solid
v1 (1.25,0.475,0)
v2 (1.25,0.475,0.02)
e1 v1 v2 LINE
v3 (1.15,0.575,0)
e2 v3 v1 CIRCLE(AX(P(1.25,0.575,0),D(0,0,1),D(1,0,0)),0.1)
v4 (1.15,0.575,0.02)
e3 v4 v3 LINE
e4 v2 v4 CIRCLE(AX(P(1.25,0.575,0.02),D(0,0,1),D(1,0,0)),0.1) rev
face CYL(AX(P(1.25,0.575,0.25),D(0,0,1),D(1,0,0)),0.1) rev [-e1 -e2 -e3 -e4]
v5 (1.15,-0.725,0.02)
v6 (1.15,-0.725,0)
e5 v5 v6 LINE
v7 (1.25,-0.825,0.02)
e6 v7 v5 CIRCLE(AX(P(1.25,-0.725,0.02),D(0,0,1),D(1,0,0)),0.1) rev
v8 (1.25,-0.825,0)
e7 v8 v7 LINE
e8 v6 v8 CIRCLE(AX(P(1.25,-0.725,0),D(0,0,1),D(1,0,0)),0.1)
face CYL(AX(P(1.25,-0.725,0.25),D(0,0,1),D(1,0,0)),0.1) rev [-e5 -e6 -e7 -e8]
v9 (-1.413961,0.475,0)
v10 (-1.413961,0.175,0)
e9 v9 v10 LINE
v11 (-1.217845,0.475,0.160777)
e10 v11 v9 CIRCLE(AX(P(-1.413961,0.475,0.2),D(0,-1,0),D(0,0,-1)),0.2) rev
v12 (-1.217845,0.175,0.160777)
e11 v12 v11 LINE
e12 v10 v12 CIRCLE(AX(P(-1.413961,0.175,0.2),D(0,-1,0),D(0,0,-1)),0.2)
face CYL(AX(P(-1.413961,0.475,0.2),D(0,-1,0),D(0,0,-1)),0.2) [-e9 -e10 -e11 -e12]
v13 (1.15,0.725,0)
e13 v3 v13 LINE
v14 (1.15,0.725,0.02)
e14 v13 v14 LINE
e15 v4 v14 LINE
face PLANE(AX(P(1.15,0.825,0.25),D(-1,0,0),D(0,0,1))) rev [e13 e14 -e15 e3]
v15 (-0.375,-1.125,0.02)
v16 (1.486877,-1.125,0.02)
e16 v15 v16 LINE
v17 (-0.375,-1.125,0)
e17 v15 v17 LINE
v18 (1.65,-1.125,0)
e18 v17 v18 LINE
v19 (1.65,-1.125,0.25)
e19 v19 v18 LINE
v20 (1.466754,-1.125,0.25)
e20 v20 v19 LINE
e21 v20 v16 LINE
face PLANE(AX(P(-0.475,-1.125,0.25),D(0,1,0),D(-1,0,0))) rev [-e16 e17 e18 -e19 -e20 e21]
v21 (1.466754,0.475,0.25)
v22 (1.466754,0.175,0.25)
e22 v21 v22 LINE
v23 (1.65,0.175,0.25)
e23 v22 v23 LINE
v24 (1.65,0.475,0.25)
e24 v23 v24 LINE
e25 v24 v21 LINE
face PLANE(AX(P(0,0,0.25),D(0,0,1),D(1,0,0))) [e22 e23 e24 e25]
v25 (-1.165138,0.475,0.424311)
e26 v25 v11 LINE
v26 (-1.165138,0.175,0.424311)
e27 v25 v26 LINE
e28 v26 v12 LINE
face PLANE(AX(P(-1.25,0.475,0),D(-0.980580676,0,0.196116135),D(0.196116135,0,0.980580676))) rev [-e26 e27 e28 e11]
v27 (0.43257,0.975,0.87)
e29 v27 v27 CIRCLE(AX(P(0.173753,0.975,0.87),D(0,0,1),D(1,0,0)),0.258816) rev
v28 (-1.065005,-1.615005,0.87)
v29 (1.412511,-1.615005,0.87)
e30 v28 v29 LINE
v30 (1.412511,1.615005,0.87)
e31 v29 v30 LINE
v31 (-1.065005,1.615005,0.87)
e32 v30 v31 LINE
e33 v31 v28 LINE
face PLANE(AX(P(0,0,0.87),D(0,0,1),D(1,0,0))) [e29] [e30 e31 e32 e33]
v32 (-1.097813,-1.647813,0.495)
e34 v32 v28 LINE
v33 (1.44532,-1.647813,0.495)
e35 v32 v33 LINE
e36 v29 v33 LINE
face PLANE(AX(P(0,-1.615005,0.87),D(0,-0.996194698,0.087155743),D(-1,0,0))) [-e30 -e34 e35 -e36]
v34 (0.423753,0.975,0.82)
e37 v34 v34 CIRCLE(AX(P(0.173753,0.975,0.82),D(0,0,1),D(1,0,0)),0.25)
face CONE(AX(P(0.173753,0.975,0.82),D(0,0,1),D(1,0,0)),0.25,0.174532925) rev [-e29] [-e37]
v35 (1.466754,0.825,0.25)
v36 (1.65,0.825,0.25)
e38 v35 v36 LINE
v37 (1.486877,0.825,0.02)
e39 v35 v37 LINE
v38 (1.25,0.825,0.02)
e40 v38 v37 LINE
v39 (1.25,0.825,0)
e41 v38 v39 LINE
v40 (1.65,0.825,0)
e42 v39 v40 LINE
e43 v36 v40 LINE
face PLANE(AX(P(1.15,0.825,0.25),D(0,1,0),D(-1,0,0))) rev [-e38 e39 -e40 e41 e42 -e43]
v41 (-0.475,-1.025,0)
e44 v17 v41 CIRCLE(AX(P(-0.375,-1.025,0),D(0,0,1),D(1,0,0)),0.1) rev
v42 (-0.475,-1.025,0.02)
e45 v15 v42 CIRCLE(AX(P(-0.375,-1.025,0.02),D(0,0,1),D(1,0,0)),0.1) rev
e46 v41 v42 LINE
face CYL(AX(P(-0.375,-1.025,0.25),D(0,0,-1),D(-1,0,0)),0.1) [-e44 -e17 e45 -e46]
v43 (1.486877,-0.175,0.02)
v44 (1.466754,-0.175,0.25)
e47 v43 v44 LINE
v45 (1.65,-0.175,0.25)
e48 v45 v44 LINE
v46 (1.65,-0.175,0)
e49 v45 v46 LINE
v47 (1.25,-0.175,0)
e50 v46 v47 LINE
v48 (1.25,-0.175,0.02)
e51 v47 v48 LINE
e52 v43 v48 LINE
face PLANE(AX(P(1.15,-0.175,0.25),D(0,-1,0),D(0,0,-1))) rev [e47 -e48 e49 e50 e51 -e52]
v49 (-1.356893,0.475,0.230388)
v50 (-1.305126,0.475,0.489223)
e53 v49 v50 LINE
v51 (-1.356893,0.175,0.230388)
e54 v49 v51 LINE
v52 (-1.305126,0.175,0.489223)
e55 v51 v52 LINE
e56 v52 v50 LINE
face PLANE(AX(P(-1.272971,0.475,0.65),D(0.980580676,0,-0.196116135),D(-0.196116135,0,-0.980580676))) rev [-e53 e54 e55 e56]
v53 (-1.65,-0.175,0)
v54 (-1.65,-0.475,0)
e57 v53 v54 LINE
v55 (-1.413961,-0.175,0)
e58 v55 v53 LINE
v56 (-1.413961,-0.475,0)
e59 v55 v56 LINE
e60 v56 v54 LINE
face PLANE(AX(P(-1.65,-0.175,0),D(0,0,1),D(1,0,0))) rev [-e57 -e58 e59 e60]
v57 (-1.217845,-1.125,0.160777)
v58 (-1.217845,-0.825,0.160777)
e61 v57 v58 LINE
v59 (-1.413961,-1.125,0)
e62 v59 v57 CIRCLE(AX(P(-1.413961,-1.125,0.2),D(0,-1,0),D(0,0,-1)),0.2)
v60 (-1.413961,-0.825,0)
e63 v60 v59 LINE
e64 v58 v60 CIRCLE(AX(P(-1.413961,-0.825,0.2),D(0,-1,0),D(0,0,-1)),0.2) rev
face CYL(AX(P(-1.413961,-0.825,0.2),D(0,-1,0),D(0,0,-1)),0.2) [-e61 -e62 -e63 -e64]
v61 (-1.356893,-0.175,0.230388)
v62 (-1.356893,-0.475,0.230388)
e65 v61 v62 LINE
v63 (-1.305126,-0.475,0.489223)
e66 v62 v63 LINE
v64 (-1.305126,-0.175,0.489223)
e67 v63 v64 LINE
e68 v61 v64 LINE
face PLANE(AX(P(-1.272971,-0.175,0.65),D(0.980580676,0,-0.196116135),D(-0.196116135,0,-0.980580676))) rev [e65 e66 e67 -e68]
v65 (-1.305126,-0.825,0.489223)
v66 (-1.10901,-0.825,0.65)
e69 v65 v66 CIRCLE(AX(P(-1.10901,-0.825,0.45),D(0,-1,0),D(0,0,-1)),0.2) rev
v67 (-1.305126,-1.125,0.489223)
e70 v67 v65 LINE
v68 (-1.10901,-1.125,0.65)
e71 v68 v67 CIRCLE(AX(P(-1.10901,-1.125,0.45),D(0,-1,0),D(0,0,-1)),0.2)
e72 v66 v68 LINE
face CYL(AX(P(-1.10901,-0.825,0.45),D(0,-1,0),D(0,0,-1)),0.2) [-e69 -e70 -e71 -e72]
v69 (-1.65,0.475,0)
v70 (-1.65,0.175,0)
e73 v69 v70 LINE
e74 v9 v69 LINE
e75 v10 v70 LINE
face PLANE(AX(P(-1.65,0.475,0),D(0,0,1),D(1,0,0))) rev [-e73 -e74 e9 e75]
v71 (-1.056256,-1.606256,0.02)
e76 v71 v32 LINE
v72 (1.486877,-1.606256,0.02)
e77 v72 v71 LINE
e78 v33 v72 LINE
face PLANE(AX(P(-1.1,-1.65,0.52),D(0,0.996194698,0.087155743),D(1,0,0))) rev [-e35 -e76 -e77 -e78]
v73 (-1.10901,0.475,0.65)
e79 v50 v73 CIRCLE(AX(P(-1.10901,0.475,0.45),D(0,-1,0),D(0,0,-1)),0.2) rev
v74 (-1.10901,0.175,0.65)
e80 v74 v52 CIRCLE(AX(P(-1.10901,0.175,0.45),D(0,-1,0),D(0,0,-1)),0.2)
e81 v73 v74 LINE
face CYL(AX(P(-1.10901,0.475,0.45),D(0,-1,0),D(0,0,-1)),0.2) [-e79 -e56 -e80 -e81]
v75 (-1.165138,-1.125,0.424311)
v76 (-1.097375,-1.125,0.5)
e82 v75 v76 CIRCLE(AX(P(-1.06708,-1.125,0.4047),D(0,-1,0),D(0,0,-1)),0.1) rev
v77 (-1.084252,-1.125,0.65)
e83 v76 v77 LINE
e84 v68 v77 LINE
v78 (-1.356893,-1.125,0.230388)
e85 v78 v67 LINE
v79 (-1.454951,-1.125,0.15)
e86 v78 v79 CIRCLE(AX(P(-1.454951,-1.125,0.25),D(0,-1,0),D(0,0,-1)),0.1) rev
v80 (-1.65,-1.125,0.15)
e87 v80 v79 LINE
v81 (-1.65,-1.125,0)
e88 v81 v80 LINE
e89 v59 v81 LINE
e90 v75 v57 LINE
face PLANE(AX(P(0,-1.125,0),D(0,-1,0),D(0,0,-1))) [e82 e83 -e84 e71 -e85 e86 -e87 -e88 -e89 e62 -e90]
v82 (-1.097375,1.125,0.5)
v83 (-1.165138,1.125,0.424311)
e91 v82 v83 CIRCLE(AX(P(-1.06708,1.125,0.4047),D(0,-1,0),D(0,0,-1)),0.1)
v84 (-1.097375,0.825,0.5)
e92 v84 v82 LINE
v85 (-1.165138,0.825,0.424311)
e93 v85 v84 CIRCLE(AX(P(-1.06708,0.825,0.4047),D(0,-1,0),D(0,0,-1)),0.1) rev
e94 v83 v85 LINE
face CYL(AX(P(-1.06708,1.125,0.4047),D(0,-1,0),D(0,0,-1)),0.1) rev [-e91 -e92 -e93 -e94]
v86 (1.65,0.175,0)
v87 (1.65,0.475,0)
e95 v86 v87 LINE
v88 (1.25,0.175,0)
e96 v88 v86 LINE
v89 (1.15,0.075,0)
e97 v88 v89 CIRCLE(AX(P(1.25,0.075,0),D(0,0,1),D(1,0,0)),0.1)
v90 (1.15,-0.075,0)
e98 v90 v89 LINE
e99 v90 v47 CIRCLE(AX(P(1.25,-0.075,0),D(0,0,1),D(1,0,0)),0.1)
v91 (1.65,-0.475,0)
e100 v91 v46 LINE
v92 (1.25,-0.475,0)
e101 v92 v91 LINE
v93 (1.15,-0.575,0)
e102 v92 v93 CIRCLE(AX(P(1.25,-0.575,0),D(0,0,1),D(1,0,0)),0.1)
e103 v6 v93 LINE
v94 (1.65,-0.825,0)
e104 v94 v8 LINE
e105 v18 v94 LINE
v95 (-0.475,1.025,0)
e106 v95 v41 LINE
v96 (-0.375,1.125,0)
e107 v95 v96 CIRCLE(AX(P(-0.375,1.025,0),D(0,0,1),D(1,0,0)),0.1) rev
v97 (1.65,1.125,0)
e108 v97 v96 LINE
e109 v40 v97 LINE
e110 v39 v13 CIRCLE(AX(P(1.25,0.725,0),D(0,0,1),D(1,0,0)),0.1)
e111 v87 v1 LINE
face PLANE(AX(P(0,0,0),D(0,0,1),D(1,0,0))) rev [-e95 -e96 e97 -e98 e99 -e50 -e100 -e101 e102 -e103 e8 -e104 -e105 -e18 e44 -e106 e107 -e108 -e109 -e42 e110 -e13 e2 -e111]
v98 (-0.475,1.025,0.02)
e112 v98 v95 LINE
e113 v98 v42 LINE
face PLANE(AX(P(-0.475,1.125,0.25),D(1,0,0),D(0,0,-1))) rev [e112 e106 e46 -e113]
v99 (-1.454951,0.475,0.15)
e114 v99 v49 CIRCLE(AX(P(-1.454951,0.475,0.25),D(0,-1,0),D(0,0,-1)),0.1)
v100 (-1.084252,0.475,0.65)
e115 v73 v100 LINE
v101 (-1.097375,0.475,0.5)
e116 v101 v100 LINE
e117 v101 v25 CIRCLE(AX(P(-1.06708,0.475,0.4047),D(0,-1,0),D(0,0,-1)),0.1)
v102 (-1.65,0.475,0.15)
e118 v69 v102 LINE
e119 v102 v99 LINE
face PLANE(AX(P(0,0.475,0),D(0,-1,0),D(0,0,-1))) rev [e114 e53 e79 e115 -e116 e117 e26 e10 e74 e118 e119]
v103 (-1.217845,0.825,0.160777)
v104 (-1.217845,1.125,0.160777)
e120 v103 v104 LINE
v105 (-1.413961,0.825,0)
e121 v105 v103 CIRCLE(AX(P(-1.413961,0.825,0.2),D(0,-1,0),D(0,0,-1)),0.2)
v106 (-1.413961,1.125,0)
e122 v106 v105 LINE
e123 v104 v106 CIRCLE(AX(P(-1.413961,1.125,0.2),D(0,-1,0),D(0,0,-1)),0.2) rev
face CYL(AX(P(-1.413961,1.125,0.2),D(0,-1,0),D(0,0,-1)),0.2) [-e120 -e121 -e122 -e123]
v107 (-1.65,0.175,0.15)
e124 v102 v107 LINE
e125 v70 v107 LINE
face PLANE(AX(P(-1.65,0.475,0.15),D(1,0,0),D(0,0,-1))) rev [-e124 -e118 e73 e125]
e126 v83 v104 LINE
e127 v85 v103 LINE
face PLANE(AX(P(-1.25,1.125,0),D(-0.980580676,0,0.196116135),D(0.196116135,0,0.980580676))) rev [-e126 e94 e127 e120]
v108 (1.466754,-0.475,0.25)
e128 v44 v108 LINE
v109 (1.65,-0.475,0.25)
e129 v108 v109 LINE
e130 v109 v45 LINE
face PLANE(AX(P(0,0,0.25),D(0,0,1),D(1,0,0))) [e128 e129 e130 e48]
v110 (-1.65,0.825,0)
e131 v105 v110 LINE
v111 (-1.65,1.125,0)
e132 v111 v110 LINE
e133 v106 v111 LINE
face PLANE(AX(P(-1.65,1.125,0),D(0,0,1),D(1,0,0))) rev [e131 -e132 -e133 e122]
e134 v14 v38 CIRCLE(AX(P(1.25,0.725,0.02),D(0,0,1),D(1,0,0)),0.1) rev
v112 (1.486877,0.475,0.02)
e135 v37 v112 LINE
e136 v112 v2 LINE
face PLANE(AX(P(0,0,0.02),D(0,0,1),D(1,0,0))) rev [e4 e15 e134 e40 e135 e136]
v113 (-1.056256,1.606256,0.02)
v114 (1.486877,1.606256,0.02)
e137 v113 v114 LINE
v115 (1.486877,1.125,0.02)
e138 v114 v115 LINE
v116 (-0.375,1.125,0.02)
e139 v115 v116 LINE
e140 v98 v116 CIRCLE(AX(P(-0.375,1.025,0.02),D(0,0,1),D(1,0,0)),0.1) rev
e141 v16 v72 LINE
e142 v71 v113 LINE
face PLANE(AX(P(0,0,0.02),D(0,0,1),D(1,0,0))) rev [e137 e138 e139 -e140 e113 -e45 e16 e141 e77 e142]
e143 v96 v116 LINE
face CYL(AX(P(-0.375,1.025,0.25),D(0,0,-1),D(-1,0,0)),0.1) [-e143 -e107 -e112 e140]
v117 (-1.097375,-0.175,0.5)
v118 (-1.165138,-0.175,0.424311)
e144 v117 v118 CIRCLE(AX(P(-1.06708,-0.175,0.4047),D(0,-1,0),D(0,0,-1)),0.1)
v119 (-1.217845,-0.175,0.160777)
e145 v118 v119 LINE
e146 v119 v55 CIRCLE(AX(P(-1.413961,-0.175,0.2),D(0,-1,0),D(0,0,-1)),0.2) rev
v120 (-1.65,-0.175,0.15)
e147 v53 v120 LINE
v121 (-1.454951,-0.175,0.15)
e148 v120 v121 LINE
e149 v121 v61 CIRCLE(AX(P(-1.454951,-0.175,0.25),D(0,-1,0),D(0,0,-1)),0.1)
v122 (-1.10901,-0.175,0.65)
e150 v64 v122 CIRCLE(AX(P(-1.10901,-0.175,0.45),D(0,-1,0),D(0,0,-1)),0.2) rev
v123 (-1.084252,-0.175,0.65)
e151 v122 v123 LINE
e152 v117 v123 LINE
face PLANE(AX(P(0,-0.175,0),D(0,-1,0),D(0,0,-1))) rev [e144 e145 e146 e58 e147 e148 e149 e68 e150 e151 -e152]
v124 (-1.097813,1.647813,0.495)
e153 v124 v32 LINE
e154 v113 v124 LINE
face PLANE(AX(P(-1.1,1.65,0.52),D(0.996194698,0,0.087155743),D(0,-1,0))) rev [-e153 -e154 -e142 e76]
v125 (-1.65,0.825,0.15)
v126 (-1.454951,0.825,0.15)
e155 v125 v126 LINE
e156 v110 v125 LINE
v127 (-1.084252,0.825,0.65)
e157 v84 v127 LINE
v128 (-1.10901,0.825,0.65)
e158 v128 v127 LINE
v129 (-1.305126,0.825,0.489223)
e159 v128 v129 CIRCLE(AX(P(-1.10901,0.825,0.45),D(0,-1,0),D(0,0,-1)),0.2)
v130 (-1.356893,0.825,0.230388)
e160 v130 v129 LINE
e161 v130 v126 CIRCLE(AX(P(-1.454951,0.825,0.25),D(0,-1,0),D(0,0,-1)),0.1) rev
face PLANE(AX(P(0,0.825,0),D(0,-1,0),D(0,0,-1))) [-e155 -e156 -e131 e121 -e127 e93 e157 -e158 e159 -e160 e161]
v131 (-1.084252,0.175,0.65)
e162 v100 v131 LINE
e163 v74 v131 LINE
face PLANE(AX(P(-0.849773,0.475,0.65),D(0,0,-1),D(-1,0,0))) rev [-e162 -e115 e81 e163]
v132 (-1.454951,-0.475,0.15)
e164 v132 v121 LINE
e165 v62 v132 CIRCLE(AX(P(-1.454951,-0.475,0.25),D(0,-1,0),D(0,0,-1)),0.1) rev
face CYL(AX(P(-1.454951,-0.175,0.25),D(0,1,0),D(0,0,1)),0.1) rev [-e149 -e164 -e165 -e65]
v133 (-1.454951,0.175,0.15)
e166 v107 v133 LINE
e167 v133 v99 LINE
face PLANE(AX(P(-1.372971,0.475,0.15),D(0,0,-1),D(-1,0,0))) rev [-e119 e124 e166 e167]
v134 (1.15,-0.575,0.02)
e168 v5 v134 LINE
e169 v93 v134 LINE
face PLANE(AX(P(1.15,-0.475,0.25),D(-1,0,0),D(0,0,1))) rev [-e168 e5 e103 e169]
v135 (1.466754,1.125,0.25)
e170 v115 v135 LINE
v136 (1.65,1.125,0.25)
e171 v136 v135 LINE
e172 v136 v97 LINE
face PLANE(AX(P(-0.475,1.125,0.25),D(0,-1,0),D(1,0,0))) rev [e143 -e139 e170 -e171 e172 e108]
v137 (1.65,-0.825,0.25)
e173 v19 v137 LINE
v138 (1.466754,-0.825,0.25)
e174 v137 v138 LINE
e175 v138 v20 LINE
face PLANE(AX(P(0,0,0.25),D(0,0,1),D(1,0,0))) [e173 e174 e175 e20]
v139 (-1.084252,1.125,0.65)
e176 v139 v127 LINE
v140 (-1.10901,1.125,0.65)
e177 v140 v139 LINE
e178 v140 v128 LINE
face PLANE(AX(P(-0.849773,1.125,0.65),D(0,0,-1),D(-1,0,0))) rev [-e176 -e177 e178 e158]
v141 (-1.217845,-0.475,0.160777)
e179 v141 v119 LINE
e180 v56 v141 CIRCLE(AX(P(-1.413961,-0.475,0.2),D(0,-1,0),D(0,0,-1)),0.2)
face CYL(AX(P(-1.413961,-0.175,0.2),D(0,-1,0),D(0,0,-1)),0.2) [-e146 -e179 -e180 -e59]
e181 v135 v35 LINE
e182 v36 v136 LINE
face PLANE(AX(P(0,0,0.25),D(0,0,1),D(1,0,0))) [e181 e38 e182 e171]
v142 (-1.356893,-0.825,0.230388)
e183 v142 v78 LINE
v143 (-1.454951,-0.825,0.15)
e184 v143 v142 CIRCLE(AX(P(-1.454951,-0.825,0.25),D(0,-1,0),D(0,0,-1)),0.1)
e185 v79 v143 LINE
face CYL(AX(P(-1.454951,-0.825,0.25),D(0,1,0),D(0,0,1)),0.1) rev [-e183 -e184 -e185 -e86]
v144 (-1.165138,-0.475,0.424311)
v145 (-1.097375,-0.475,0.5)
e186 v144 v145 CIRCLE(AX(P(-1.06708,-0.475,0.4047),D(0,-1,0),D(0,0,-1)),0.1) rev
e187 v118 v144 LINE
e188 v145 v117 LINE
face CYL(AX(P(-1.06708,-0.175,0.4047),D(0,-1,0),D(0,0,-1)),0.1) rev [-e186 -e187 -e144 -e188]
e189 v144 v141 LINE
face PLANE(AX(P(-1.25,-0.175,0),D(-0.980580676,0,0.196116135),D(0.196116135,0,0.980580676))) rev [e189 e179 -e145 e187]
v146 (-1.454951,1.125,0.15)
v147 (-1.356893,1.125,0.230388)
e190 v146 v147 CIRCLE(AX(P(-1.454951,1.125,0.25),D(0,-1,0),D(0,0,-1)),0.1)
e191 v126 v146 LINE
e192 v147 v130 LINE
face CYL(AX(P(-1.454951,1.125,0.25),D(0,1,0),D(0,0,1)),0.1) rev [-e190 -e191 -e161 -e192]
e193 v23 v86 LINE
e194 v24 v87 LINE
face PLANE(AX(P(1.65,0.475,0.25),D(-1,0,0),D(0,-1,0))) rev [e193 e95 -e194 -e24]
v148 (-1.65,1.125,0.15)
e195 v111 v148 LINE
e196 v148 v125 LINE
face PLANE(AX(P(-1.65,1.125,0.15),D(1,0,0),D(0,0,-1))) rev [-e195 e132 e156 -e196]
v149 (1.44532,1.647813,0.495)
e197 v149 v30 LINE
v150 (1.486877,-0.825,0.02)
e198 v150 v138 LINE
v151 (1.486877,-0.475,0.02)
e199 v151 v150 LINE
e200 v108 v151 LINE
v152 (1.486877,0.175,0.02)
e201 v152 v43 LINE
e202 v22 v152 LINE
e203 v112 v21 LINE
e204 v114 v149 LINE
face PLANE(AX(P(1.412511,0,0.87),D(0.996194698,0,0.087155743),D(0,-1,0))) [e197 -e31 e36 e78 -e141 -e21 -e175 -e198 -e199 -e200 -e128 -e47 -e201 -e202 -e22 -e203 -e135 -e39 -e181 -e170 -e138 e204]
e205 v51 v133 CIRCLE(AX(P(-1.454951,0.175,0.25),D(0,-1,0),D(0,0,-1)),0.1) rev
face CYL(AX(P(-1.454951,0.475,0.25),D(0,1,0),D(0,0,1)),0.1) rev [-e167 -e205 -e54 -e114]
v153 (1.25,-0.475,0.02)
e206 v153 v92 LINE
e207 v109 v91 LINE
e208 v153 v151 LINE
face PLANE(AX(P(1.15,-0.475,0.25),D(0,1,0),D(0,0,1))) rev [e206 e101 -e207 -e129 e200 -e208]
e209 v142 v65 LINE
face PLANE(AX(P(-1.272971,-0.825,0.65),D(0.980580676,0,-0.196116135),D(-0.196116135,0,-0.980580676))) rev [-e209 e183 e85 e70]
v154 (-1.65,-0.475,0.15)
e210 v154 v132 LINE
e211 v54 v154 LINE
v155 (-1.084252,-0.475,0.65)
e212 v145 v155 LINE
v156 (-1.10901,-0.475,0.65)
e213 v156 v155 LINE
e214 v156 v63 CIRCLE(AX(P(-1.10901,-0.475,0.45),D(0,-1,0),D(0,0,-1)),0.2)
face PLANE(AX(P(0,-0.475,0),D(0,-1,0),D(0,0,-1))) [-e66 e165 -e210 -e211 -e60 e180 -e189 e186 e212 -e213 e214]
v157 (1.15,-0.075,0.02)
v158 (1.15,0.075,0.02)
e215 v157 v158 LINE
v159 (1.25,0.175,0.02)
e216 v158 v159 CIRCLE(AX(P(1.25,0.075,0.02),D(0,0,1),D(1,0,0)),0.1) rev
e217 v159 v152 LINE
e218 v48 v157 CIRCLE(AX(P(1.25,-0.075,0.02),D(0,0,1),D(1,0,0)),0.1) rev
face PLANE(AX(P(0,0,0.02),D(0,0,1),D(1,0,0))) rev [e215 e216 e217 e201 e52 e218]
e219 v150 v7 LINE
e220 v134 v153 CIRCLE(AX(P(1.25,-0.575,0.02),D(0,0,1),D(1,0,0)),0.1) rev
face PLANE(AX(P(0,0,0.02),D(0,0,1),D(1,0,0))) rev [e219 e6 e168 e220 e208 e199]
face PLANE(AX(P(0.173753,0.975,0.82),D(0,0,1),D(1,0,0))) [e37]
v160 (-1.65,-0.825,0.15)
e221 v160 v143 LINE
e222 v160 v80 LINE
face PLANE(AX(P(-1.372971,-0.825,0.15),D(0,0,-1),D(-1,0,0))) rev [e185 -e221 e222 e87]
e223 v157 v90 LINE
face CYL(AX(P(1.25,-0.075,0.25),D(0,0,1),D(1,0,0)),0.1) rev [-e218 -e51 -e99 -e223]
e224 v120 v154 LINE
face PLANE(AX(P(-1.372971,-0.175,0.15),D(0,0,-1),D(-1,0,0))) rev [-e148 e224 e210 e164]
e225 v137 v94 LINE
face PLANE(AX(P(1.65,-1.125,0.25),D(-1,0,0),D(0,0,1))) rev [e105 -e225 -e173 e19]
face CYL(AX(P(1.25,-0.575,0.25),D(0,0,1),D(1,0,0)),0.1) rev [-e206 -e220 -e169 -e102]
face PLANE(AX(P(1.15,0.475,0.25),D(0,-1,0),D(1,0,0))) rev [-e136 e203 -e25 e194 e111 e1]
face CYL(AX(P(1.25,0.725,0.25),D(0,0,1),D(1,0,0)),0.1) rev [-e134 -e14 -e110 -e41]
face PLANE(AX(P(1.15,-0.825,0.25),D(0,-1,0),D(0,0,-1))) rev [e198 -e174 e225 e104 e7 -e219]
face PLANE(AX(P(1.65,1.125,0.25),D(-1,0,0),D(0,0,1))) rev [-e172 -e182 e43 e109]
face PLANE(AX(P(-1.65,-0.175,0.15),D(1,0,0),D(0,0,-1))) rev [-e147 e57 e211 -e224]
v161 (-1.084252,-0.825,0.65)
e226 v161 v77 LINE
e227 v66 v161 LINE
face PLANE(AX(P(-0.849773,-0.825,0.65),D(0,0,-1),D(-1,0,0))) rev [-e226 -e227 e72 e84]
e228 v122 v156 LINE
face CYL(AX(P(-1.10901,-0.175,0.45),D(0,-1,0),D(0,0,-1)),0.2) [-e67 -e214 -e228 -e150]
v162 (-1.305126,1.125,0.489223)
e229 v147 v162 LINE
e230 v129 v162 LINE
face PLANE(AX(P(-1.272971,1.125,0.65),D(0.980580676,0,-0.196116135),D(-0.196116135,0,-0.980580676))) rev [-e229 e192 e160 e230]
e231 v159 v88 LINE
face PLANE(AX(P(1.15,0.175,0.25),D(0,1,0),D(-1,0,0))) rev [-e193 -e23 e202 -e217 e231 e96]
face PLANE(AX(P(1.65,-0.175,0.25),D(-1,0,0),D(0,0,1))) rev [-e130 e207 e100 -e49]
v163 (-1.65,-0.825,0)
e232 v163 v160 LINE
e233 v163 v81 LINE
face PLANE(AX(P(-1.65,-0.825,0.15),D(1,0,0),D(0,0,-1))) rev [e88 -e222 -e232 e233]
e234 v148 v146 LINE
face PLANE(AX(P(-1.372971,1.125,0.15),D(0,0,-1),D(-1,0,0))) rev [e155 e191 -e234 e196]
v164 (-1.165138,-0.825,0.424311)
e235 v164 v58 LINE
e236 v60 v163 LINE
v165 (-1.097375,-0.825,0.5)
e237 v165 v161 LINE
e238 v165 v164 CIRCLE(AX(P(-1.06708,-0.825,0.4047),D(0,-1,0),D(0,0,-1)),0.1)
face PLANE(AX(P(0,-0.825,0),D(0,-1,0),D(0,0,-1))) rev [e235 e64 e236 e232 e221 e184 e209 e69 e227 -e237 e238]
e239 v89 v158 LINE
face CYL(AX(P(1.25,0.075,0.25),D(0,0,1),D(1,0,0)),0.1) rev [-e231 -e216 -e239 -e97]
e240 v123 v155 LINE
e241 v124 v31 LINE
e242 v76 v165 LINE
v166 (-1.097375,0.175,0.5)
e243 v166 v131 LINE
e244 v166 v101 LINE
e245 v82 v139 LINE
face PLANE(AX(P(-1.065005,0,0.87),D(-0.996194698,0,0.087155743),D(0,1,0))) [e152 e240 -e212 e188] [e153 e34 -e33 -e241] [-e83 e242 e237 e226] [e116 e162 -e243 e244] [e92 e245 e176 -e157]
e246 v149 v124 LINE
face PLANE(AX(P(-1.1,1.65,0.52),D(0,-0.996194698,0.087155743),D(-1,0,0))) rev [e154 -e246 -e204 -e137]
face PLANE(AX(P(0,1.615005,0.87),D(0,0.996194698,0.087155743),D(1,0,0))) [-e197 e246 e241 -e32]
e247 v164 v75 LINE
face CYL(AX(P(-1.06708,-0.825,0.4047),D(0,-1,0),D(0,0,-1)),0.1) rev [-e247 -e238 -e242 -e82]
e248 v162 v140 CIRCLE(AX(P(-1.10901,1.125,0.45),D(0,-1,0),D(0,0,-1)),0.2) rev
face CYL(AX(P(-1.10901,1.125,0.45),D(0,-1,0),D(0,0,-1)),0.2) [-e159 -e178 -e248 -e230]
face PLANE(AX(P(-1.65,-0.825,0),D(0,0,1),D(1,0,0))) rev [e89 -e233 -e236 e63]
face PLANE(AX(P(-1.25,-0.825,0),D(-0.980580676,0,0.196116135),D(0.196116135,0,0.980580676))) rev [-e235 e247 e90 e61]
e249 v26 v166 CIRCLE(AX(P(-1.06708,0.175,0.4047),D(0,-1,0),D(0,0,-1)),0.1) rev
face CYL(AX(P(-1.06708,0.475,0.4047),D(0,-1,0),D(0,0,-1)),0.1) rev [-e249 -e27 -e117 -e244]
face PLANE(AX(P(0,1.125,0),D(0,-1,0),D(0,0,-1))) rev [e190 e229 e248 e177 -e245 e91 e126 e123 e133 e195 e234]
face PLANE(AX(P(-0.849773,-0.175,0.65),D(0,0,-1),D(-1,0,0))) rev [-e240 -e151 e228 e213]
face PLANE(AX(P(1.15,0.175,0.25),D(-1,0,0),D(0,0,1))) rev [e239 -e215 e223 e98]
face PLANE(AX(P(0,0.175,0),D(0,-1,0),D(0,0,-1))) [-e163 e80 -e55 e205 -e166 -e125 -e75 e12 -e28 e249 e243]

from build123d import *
from OCP.BRepFilletAPI import BRepFilletAPI_MakeChamfer

# Parameters (mm, degrees)
BOSS_EXTRUDE1_DEPTH    = 0.25
FILLET1_R              = 0.1
SKETCH3_W              = 2.6
SKETCH3_H              = 3.3
BOSS_EXTRUDE2_DEPTH    = 0.85
CHAMFER2_SIZE          = 1
CHAMFER2_SIZE_2        = 0.087488664
CHAMFER3_SIZE          = 0.4
CHAMFER3_SIZE2         = 0.034995465
CHAMFER4_SIZE          = 0.043744332
CHAMFER4_SIZE_2        = 0.5
BOSS_EXTRUDE3_DEPTH    = 0.15
FILLET2_R              = 0.1
FILLET3_R              = 0.2
LPATTERN1_COUNT        = 4
LPATTERN1_PITCH        = 0.65
FILLET2_OF_LPATTERN1_R = 0.1
FILLET3_OF_LPATTERN1_R = 0.2
SKETCH5_R              = 0.25
CUT_EXTRUDE1_DEPTH     = 0.05
CHAMFER5_SIZE2         = 0.05
CHAMFER5_SIZE          = 0.008816349


# Some blends are built 0.0001 mm under size
with BuildPart() as part:
    # Sketch2 → Boss-Extrude1 (new body)
    with BuildSketch(Plane.XY):
        Polygon((1.15, 0.175), (1.15, -0.175), (1.65, -0.175), (1.65, -0.475), (1.15, -0.475), (1.15, -0.825), (1.65, -0.825), (1.65, -1.125), (-0.475, -1.125), (-0.475, 1.125), (1.65, 1.125), (1.65, 0.825), (1.15, 0.825), (1.15, 0.475), (1.65, 0.475), (1.65, 0.175), align=None)
    extrude(amount=BOSS_EXTRUDE1_DEPTH)

    # Fillet1
    fillet1_edges = [part.edges().sort_by_distance(p)[0] for p in [
        (-0.475, 1.125, 0.125),
        (1.15, 0.825, 0.125),
        (1.15, 0.475, 0.125),
        (1.15, 0.175, 0.125),
        (1.15, -0.175, 0.125),
        (1.15, -0.475, 0.125),
        (1.15, -0.825, 0.125),
        (-0.475, -1.125, 0.125),
    ]]
    fillet(fillet1_edges, radius=FILLET1_R)

    # Sketch3 → Boss-Extrude2 (add)
    with BuildSketch(Plane.XY.offset(0.02)):
        with Locations((0.2, 0)):
            Rectangle(SKETCH3_W, SKETCH3_H)
    extrude(amount=BOSS_EXTRUDE2_DEPTH)

    # Chamfer2
    # the kernel refuses this chamfer: 1, 0.087488664 mm, written as the material it takes off along each edge
    with BuildSketch(Plane(origin=(1.5, 4.24963408, 0.87), x_dir=(0.0033526157940331684, 0, -0.9999943799678764), z_dir=(0, -1, 0))) as chamfer2_piece_1_section:
        Polygon((CHAMFER2_SIZE * 0.999994379968, -CHAMFER2_SIZE * 0.00335261579403), (-CHAMFER2_SIZE_2 * 0.00335261577587, -CHAMFER2_SIZE_2 * 0.999994374549), (0, 0), align=None)
    chamfer2_piece_1 = extrude(amount=8.49926816, mode=Mode.PRIVATE)
    chamfer2_piece_1 = split(chamfer2_piece_1, bisect_by=Plane(origin=(1.487680055, 1.125, 0.15163522), z_dir=(0, 1, 0)), keep=Keep.TOP, mode=Mode.PRIVATE)
    add(chamfer2_piece_1, mode=Mode.SUBTRACT)
    with BuildSketch(Plane(origin=(1.5, 4.24963408, 0.87), x_dir=(0.0033526157940331684, 0, -0.9999943799678764), z_dir=(0, -1, 0))) as chamfer2_piece_2_section:
        Polygon((CHAMFER2_SIZE * 0.999994379968, -CHAMFER2_SIZE * 0.00335261579403), (-CHAMFER2_SIZE_2 * 0.00335261577587, -CHAMFER2_SIZE_2 * 0.999994374549), (0, 0), align=None)
    chamfer2_piece_2 = extrude(amount=8.49926816, mode=Mode.PRIVATE)
    chamfer2_piece_2 = split(chamfer2_piece_2, bisect_by=Plane(origin=(1.467785575, 0.975, 0.25), z_dir=(0, 0, 1)), keep=Keep.TOP, mode=Mode.PRIVATE)
    add(chamfer2_piece_2, mode=Mode.SUBTRACT)
    with BuildSketch(Plane(origin=(1.5, 4.24963408, 0.87), x_dir=(0.0033526157940331684, 0, -0.9999943799678764), z_dir=(0, -1, 0))) as chamfer2_piece_3_section:
        Polygon((CHAMFER2_SIZE * 0.999994379968, -CHAMFER2_SIZE * 0.00335261579403), (-CHAMFER2_SIZE_2 * 0.00335261577587, -CHAMFER2_SIZE_2 * 0.999994374549), (0, 0), align=None)
    chamfer2_piece_3 = extrude(amount=8.49926816, mode=Mode.PRIVATE)
    chamfer2_piece_3 = split(chamfer2_piece_3, bisect_by=Plane(origin=(1.487680055, 0.475, 0.15163522), z_dir=(0, 1, 0)), keep=Keep.TOP, mode=Mode.PRIVATE)
    chamfer2_piece_3 = split(chamfer2_piece_3, bisect_by=Plane(origin=(1.487680055, 0.825, 0.15163522), z_dir=(0, -1, 0)), keep=Keep.TOP, mode=Mode.PRIVATE)
    add(chamfer2_piece_3, mode=Mode.SUBTRACT)
    with BuildSketch(Plane(origin=(1.5, 4.24963408, 0.87), x_dir=(0.0033526157940331684, 0, -0.9999943799678764), z_dir=(0, -1, 0))) as chamfer2_piece_4_section:
        Polygon((CHAMFER2_SIZE * 0.999994379968, -CHAMFER2_SIZE * 0.00335261579403), (-CHAMFER2_SIZE_2 * 0.00335261577587, -CHAMFER2_SIZE_2 * 0.999994374549), (0, 0), align=None)
    chamfer2_piece_4 = extrude(amount=8.49926816, mode=Mode.PRIVATE)
    chamfer2_piece_4 = split(chamfer2_piece_4, bisect_by=Plane(origin=(1.487680055, 0.175, 0.15163522), z_dir=(0, -1, 0)), keep=Keep.TOP, mode=Mode.PRIVATE)
    chamfer2_piece_4 = split(chamfer2_piece_4, bisect_by=Plane(origin=(1.487680055, -0.175, 0.15163522), z_dir=(0, 1, 0)), keep=Keep.TOP, mode=Mode.PRIVATE)
    add(chamfer2_piece_4, mode=Mode.SUBTRACT)
    with BuildSketch(Plane(origin=(1.5, 4.24963408, 0.87), x_dir=(0.0033526157940331684, 0, -0.9999943799678764), z_dir=(0, -1, 0))) as chamfer2_piece_5_section:
        Polygon((CHAMFER2_SIZE * 0.999994379968, -CHAMFER2_SIZE * 0.00335261579403), (-CHAMFER2_SIZE_2 * 0.00335261577587, -CHAMFER2_SIZE_2 * 0.999994374549), (0, 0), align=None)
    chamfer2_piece_5 = extrude(amount=8.49926816, mode=Mode.PRIVATE)
    chamfer2_piece_5 = split(chamfer2_piece_5, bisect_by=Plane(origin=(1.487680055, -0.475, 0.15163522), z_dir=(0, -1, 0)), keep=Keep.TOP, mode=Mode.PRIVATE)
    chamfer2_piece_5 = split(chamfer2_piece_5, bisect_by=Plane(origin=(1.487680055, -0.825, 0.15163522), z_dir=(0, 1, 0)), keep=Keep.TOP, mode=Mode.PRIVATE)
    add(chamfer2_piece_5, mode=Mode.SUBTRACT)
    with BuildSketch(Plane(origin=(1.5, 4.24963408, 0.87), x_dir=(0.0033526157940331684, 0, -0.9999943799678764), z_dir=(0, -1, 0))) as chamfer2_piece_6_section:
        Polygon((CHAMFER2_SIZE * 0.999994379968, -CHAMFER2_SIZE * 0.00335261579403), (-CHAMFER2_SIZE_2 * 0.00335261577587, -CHAMFER2_SIZE_2 * 0.999994374549), (0, 0), align=None)
    chamfer2_piece_6 = extrude(amount=8.49926816, mode=Mode.PRIVATE)
    chamfer2_piece_6 = split(chamfer2_piece_6, bisect_by=Plane(origin=(1.487680055, -1.125, 0.15163522), z_dir=(0, -1, 0)), keep=Keep.TOP, mode=Mode.PRIVATE)
    add(chamfer2_piece_6, mode=Mode.SUBTRACT)

    # Chamfer3: one chamfer whose edges measure the first distance from different faces: ONE call of the kernel's chamfer builder (chamfer() names one face for all edges)
    chamfer3_edges_1 = [part.edges().sort_by_distance(p)[0] for p in [
        (-1.1, 0, 0.87),
    ]]
    chamfer3_side_1 = [part.faces().sort_by_distance(p)[0] for p in [
        (-1.1, 0, 0.445),
    ]]
    chamfer3_edges_2 = [part.edges().sort_by_distance(p)[0] for p in [
        (0.156255668, -1.65, 0.87),
    ]]
    chamfer3_side_2 = [part.faces().sort_by_distance(p)[0] for p in [
        (0.174937383, -1.65, 0.442934048),
    ]]
    chamfer3_edges_3 = [part.edges().sort_by_distance(p)[0] for p in [
        (0.156255668, 1.65, 0.87),
    ]]
    chamfer3_side_3 = [part.faces().sort_by_distance(p)[0] for p in [
        (0.174937383, 1.65, 0.442934048),
    ]]
    chamfer3 = BRepFilletAPI_MakeChamfer(part.part.solid().wrapped)
    for e in chamfer3_edges_1:
        chamfer3.Add(CHAMFER3_SIZE, CHAMFER3_SIZE2, e.wrapped, chamfer3_side_1[0].wrapped)  # the first distance lies on this face
    for e in chamfer3_edges_2:
        chamfer3.Add(CHAMFER3_SIZE, CHAMFER3_SIZE2, e.wrapped, chamfer3_side_2[0].wrapped)  # the first distance lies on this face
    for e in chamfer3_edges_3:
        chamfer3.Add(CHAMFER3_SIZE, CHAMFER3_SIZE2, e.wrapped, chamfer3_side_3[0].wrapped)  # the first distance lies on this face
    add(Compound.cast(chamfer3.Shape()), mode=Mode.REPLACE)

    # Chamfer4
    # the kernel refuses this chamfer: 0.5, 0.043744332 mm, written as the material it takes off along each edge
    with BuildSketch(Plane(origin=(-2.39981704, 1.65, 0.02), x_dir=(0, -0.9159861691531118, -0.4012098427509062), z_dir=(1, 0, 0))) as chamfer4_piece_1:
        Polygon((CHAMFER4_SIZE * 0.91598616419, -CHAMFER4_SIZE * 0.401209840577), (-CHAMFER4_SIZE_2 * 0.401209842751, -CHAMFER4_SIZE_2 * 0.915986169153), (0, 0), align=None)
    extrude(amount=5.18651078, mode=Mode.SUBTRACT)
    with BuildSketch(Plane(origin=(-1.1, -2.94981704, 0.02), x_dir=(0.9159861691531118, 0, -0.4012098427509062), z_dir=(0, 1, 0))) as chamfer4_piece_2:
        Polygon((CHAMFER4_SIZE * 0.91598616419, -CHAMFER4_SIZE * 0.401209840577), (-CHAMFER4_SIZE_2 * 0.401209842751, -CHAMFER4_SIZE_2 * 0.915986169153), (0, 0), align=None)
    extrude(amount=5.89963408, mode=Mode.SUBTRACT)
    with BuildSketch(Plane(origin=(2.78669374, -1.65, 0.02), x_dir=(0, -0.0033526157940331684, 0.9999943799678764), z_dir=(-1, 0, 0))) as chamfer4_piece_3:
        Polygon((CHAMFER4_SIZE_2 * 0.999994379968, CHAMFER4_SIZE_2 * 0.00335261579403), (-CHAMFER4_SIZE * 0.00335261577587, CHAMFER4_SIZE * 0.999994374549), (0, 0), align=None)
    extrude(amount=5.18651078, mode=Mode.SUBTRACT)

    # Sketch4 → Boss-Extrude3 (add, symmetric)
    with BuildSketch(Plane(origin=(0, 0.975, 0), x_dir=(1, 0, 0), z_dir=(0, 1, 0))):
        Polygon((-1.65, 0), (-1.25, 0), (-1.15, -0.5), (-0.849772873, -0.5), (-0.849772873, -0.65), (-1.272970585, -0.65), (-1.372970585, -0.15), (-1.65, -0.15), align=None)
    boss_extrude3 = extrude(amount=BOSS_EXTRUDE3_DEPTH, both=True)

    # Fillet2
    # the kernel refuses this fillet: 0.1 mm, written as the material it adds along each edge
    with BuildSketch(Plane(origin=(-1.372970585, 0.825, 0.15), x_dir=(0.19611613513818507, 0, 0.98058067569092), z_dir=(0, 1, 0))) as fillet2_piece_1:
        with BuildLine():
            CenterArc((FILLET2_R * 0.819803902719, -FILLET2_R), FILLET2_R, 90, 78.690067526)
            Line((-FILLET2_R * 0.160776772972, -FILLET2_R * 0.803883864862), (-FILLET2_R * 0.180388386486, -FILLET2_R * 0.799961542159))
            Line((-FILLET2_R * 0.180388386486, -FILLET2_R * 0.799961542159), (-FILLET2_R * 0.0163960780544, FILLET2_R * 0.02))
            Line((-FILLET2_R * 0.0163960780544, FILLET2_R * 0.02), (FILLET2_R * 0.819803902719, FILLET2_R * 0.02))
            Line((FILLET2_R * 0.819803902719, FILLET2_R * 0.02), (FILLET2_R * 0.819803902719, 0))
        make_face()
    extrude(amount=0.3)
    with BuildSketch(Plane(origin=(-1.15, 1.125, 0.5), x_dir=(1, 0, 0), z_dir=(0, -1, 0))) as fillet2_piece_2:
        with BuildLine():
            CenterArc((0.082920302, -0.095300441), FILLET2_R, 107.635259495, 61.054808031)
            Line((-0.015137766, -0.075688828), (-0.017098927, -0.075296595))
            Line((-0.017098927, -0.075296595), (-0.001961161, 0.000392232))
            Line((-0.001961161, 0.000392232), (0, 0.002))
            ThreePointArc((0, 0.002), (0.02631233, 0.002), (0.052018747, 0.001906009))
            Line((0.052018747, 0.001906009), (0.05262466, 0))
        make_face()
    extrude(amount=0.3)

    # Fillet3
    fillet3_edges = [part.edges().sort_by_distance(p)[0] for p in [
        (-1.272970585, 0.975, 0.65),
        (-1.25, 0.975, 0),
    ]]
    fillet(fillet3_edges, radius=FILLET3_R)

    # LPattern1: Boss-Extrude3 ×4
    with Locations(*[(0, -i * LPATTERN1_PITCH, 0) for i in range(1, LPATTERN1_COUNT)]):
        add(boss_extrude3)

    # Fillet2 of LPattern1
    # the kernel refuses this fillet: 0.1 mm, written as the material it adds along each edge
    with BuildSketch(Plane(origin=(-1.372970585, 0.175, 0.15), x_dir=(0.19611613513818507, 0, 0.98058067569092), z_dir=(0, 1, 0)), Plane(origin=(-1.372970585, -0.475, 0.15), x_dir=(0.19611613513818507, 0, 0.98058067569092), z_dir=(0, 1, 0)), Plane(origin=(-1.372970585, -1.125, 0.15), x_dir=(0.19611613513818507, 0, 0.98058067569092), z_dir=(0, 1, 0))) as fillet2_of_lpattern1_piece_1:
        with BuildLine():
            CenterArc((FILLET2_OF_LPATTERN1_R * 0.819803902719, -FILLET2_OF_LPATTERN1_R), FILLET2_OF_LPATTERN1_R, 90, 78.690067526)
            Line((-FILLET2_OF_LPATTERN1_R * 0.160776772972, -FILLET2_OF_LPATTERN1_R * 0.803883864862), (-FILLET2_OF_LPATTERN1_R * 0.180388386486, -FILLET2_OF_LPATTERN1_R * 0.799961542159))
            Line((-FILLET2_OF_LPATTERN1_R * 0.180388386486, -FILLET2_OF_LPATTERN1_R * 0.799961542159), (-FILLET2_OF_LPATTERN1_R * 0.0163960780544, FILLET2_OF_LPATTERN1_R * 0.02))
            Line((-FILLET2_OF_LPATTERN1_R * 0.0163960780544, FILLET2_OF_LPATTERN1_R * 0.02), (FILLET2_OF_LPATTERN1_R * 0.819803902719, FILLET2_OF_LPATTERN1_R * 0.02))
            Line((FILLET2_OF_LPATTERN1_R * 0.819803902719, FILLET2_OF_LPATTERN1_R * 0.02), (FILLET2_OF_LPATTERN1_R * 0.819803902719, 0))
        make_face()
    extrude(amount=0.3)
    with BuildSketch(Plane(origin=(-1.15, 0.475, 0.5), x_dir=(1, 0, 0), z_dir=(0, -1, 0)), Plane(origin=(-1.15, -0.175, 0.5), x_dir=(1, 0, 0), z_dir=(0, -1, 0)), Plane(origin=(-1.15, -0.825, 0.5), x_dir=(1, 0, 0), z_dir=(0, -1, 0))) as fillet2_of_lpattern1_piece_2:
        with BuildLine():
            CenterArc((0.082920302, -0.095300441), FILLET2_OF_LPATTERN1_R, 107.635259495, 61.054808031)
            Line((-0.015137766, -0.075688828), (-0.017098927, -0.075296595))
            Line((-0.017098927, -0.075296595), (-0.001961161, 0.000392232))
            Line((-0.001961161, 0.000392232), (0, 0.002))
            ThreePointArc((0, 0.002), (0.02631233, 0.002), (0.052018747, 0.001906009))
            Line((0.052018747, 0.001906009), (0.05262466, 0))
        make_face()
    extrude(amount=0.3)

    # Fillet3 of LPattern1
    fillet3_of_lpattern1_edges = [part.edges().sort_by_distance(p)[0] for p in [
        (-1.272970585, 0.325, 0.65),
        (-1.25, 0.325, 0),
        (-1.272970585, -0.325, 0.65),
        (-1.25, -0.325, 0),
        (-1.272970585, -0.975, 0.65),
        (-1.25, -0.975, 0),
    ]]
    fillet(fillet3_of_lpattern1_edges, radius=FILLET3_OF_LPATTERN1_R)

    # Sketch5 → Cut-Extrude1 (cut)
    with BuildSketch(Plane.XY.offset(0.87)):
        with Locations((0.173753401, 0.975)):
            Circle(SKETCH5_R)
    extrude(amount=-CUT_EXTRUDE1_DEPTH, mode=Mode.SUBTRACT)

    # Chamfer5
    chamfer5_edges = [part.edges().sort_by_distance(p)[0] for p in [
        (-0.076246599, 0.975, 0.87),
    ]]
    chamfer5_side = [part.faces().sort_by_distance(p)[0] for p in [
        (-0.076422926, 0.975, 0.87),
    ]]
    chamfer(chamfer5_edges, length=CHAMFER5_SIZE - 0.0001, length2=CHAMFER5_SIZE2 - 0.0001, reference=chamfer5_side[0])  # a hair under: the kernel refuses the full size


solid = part.part
